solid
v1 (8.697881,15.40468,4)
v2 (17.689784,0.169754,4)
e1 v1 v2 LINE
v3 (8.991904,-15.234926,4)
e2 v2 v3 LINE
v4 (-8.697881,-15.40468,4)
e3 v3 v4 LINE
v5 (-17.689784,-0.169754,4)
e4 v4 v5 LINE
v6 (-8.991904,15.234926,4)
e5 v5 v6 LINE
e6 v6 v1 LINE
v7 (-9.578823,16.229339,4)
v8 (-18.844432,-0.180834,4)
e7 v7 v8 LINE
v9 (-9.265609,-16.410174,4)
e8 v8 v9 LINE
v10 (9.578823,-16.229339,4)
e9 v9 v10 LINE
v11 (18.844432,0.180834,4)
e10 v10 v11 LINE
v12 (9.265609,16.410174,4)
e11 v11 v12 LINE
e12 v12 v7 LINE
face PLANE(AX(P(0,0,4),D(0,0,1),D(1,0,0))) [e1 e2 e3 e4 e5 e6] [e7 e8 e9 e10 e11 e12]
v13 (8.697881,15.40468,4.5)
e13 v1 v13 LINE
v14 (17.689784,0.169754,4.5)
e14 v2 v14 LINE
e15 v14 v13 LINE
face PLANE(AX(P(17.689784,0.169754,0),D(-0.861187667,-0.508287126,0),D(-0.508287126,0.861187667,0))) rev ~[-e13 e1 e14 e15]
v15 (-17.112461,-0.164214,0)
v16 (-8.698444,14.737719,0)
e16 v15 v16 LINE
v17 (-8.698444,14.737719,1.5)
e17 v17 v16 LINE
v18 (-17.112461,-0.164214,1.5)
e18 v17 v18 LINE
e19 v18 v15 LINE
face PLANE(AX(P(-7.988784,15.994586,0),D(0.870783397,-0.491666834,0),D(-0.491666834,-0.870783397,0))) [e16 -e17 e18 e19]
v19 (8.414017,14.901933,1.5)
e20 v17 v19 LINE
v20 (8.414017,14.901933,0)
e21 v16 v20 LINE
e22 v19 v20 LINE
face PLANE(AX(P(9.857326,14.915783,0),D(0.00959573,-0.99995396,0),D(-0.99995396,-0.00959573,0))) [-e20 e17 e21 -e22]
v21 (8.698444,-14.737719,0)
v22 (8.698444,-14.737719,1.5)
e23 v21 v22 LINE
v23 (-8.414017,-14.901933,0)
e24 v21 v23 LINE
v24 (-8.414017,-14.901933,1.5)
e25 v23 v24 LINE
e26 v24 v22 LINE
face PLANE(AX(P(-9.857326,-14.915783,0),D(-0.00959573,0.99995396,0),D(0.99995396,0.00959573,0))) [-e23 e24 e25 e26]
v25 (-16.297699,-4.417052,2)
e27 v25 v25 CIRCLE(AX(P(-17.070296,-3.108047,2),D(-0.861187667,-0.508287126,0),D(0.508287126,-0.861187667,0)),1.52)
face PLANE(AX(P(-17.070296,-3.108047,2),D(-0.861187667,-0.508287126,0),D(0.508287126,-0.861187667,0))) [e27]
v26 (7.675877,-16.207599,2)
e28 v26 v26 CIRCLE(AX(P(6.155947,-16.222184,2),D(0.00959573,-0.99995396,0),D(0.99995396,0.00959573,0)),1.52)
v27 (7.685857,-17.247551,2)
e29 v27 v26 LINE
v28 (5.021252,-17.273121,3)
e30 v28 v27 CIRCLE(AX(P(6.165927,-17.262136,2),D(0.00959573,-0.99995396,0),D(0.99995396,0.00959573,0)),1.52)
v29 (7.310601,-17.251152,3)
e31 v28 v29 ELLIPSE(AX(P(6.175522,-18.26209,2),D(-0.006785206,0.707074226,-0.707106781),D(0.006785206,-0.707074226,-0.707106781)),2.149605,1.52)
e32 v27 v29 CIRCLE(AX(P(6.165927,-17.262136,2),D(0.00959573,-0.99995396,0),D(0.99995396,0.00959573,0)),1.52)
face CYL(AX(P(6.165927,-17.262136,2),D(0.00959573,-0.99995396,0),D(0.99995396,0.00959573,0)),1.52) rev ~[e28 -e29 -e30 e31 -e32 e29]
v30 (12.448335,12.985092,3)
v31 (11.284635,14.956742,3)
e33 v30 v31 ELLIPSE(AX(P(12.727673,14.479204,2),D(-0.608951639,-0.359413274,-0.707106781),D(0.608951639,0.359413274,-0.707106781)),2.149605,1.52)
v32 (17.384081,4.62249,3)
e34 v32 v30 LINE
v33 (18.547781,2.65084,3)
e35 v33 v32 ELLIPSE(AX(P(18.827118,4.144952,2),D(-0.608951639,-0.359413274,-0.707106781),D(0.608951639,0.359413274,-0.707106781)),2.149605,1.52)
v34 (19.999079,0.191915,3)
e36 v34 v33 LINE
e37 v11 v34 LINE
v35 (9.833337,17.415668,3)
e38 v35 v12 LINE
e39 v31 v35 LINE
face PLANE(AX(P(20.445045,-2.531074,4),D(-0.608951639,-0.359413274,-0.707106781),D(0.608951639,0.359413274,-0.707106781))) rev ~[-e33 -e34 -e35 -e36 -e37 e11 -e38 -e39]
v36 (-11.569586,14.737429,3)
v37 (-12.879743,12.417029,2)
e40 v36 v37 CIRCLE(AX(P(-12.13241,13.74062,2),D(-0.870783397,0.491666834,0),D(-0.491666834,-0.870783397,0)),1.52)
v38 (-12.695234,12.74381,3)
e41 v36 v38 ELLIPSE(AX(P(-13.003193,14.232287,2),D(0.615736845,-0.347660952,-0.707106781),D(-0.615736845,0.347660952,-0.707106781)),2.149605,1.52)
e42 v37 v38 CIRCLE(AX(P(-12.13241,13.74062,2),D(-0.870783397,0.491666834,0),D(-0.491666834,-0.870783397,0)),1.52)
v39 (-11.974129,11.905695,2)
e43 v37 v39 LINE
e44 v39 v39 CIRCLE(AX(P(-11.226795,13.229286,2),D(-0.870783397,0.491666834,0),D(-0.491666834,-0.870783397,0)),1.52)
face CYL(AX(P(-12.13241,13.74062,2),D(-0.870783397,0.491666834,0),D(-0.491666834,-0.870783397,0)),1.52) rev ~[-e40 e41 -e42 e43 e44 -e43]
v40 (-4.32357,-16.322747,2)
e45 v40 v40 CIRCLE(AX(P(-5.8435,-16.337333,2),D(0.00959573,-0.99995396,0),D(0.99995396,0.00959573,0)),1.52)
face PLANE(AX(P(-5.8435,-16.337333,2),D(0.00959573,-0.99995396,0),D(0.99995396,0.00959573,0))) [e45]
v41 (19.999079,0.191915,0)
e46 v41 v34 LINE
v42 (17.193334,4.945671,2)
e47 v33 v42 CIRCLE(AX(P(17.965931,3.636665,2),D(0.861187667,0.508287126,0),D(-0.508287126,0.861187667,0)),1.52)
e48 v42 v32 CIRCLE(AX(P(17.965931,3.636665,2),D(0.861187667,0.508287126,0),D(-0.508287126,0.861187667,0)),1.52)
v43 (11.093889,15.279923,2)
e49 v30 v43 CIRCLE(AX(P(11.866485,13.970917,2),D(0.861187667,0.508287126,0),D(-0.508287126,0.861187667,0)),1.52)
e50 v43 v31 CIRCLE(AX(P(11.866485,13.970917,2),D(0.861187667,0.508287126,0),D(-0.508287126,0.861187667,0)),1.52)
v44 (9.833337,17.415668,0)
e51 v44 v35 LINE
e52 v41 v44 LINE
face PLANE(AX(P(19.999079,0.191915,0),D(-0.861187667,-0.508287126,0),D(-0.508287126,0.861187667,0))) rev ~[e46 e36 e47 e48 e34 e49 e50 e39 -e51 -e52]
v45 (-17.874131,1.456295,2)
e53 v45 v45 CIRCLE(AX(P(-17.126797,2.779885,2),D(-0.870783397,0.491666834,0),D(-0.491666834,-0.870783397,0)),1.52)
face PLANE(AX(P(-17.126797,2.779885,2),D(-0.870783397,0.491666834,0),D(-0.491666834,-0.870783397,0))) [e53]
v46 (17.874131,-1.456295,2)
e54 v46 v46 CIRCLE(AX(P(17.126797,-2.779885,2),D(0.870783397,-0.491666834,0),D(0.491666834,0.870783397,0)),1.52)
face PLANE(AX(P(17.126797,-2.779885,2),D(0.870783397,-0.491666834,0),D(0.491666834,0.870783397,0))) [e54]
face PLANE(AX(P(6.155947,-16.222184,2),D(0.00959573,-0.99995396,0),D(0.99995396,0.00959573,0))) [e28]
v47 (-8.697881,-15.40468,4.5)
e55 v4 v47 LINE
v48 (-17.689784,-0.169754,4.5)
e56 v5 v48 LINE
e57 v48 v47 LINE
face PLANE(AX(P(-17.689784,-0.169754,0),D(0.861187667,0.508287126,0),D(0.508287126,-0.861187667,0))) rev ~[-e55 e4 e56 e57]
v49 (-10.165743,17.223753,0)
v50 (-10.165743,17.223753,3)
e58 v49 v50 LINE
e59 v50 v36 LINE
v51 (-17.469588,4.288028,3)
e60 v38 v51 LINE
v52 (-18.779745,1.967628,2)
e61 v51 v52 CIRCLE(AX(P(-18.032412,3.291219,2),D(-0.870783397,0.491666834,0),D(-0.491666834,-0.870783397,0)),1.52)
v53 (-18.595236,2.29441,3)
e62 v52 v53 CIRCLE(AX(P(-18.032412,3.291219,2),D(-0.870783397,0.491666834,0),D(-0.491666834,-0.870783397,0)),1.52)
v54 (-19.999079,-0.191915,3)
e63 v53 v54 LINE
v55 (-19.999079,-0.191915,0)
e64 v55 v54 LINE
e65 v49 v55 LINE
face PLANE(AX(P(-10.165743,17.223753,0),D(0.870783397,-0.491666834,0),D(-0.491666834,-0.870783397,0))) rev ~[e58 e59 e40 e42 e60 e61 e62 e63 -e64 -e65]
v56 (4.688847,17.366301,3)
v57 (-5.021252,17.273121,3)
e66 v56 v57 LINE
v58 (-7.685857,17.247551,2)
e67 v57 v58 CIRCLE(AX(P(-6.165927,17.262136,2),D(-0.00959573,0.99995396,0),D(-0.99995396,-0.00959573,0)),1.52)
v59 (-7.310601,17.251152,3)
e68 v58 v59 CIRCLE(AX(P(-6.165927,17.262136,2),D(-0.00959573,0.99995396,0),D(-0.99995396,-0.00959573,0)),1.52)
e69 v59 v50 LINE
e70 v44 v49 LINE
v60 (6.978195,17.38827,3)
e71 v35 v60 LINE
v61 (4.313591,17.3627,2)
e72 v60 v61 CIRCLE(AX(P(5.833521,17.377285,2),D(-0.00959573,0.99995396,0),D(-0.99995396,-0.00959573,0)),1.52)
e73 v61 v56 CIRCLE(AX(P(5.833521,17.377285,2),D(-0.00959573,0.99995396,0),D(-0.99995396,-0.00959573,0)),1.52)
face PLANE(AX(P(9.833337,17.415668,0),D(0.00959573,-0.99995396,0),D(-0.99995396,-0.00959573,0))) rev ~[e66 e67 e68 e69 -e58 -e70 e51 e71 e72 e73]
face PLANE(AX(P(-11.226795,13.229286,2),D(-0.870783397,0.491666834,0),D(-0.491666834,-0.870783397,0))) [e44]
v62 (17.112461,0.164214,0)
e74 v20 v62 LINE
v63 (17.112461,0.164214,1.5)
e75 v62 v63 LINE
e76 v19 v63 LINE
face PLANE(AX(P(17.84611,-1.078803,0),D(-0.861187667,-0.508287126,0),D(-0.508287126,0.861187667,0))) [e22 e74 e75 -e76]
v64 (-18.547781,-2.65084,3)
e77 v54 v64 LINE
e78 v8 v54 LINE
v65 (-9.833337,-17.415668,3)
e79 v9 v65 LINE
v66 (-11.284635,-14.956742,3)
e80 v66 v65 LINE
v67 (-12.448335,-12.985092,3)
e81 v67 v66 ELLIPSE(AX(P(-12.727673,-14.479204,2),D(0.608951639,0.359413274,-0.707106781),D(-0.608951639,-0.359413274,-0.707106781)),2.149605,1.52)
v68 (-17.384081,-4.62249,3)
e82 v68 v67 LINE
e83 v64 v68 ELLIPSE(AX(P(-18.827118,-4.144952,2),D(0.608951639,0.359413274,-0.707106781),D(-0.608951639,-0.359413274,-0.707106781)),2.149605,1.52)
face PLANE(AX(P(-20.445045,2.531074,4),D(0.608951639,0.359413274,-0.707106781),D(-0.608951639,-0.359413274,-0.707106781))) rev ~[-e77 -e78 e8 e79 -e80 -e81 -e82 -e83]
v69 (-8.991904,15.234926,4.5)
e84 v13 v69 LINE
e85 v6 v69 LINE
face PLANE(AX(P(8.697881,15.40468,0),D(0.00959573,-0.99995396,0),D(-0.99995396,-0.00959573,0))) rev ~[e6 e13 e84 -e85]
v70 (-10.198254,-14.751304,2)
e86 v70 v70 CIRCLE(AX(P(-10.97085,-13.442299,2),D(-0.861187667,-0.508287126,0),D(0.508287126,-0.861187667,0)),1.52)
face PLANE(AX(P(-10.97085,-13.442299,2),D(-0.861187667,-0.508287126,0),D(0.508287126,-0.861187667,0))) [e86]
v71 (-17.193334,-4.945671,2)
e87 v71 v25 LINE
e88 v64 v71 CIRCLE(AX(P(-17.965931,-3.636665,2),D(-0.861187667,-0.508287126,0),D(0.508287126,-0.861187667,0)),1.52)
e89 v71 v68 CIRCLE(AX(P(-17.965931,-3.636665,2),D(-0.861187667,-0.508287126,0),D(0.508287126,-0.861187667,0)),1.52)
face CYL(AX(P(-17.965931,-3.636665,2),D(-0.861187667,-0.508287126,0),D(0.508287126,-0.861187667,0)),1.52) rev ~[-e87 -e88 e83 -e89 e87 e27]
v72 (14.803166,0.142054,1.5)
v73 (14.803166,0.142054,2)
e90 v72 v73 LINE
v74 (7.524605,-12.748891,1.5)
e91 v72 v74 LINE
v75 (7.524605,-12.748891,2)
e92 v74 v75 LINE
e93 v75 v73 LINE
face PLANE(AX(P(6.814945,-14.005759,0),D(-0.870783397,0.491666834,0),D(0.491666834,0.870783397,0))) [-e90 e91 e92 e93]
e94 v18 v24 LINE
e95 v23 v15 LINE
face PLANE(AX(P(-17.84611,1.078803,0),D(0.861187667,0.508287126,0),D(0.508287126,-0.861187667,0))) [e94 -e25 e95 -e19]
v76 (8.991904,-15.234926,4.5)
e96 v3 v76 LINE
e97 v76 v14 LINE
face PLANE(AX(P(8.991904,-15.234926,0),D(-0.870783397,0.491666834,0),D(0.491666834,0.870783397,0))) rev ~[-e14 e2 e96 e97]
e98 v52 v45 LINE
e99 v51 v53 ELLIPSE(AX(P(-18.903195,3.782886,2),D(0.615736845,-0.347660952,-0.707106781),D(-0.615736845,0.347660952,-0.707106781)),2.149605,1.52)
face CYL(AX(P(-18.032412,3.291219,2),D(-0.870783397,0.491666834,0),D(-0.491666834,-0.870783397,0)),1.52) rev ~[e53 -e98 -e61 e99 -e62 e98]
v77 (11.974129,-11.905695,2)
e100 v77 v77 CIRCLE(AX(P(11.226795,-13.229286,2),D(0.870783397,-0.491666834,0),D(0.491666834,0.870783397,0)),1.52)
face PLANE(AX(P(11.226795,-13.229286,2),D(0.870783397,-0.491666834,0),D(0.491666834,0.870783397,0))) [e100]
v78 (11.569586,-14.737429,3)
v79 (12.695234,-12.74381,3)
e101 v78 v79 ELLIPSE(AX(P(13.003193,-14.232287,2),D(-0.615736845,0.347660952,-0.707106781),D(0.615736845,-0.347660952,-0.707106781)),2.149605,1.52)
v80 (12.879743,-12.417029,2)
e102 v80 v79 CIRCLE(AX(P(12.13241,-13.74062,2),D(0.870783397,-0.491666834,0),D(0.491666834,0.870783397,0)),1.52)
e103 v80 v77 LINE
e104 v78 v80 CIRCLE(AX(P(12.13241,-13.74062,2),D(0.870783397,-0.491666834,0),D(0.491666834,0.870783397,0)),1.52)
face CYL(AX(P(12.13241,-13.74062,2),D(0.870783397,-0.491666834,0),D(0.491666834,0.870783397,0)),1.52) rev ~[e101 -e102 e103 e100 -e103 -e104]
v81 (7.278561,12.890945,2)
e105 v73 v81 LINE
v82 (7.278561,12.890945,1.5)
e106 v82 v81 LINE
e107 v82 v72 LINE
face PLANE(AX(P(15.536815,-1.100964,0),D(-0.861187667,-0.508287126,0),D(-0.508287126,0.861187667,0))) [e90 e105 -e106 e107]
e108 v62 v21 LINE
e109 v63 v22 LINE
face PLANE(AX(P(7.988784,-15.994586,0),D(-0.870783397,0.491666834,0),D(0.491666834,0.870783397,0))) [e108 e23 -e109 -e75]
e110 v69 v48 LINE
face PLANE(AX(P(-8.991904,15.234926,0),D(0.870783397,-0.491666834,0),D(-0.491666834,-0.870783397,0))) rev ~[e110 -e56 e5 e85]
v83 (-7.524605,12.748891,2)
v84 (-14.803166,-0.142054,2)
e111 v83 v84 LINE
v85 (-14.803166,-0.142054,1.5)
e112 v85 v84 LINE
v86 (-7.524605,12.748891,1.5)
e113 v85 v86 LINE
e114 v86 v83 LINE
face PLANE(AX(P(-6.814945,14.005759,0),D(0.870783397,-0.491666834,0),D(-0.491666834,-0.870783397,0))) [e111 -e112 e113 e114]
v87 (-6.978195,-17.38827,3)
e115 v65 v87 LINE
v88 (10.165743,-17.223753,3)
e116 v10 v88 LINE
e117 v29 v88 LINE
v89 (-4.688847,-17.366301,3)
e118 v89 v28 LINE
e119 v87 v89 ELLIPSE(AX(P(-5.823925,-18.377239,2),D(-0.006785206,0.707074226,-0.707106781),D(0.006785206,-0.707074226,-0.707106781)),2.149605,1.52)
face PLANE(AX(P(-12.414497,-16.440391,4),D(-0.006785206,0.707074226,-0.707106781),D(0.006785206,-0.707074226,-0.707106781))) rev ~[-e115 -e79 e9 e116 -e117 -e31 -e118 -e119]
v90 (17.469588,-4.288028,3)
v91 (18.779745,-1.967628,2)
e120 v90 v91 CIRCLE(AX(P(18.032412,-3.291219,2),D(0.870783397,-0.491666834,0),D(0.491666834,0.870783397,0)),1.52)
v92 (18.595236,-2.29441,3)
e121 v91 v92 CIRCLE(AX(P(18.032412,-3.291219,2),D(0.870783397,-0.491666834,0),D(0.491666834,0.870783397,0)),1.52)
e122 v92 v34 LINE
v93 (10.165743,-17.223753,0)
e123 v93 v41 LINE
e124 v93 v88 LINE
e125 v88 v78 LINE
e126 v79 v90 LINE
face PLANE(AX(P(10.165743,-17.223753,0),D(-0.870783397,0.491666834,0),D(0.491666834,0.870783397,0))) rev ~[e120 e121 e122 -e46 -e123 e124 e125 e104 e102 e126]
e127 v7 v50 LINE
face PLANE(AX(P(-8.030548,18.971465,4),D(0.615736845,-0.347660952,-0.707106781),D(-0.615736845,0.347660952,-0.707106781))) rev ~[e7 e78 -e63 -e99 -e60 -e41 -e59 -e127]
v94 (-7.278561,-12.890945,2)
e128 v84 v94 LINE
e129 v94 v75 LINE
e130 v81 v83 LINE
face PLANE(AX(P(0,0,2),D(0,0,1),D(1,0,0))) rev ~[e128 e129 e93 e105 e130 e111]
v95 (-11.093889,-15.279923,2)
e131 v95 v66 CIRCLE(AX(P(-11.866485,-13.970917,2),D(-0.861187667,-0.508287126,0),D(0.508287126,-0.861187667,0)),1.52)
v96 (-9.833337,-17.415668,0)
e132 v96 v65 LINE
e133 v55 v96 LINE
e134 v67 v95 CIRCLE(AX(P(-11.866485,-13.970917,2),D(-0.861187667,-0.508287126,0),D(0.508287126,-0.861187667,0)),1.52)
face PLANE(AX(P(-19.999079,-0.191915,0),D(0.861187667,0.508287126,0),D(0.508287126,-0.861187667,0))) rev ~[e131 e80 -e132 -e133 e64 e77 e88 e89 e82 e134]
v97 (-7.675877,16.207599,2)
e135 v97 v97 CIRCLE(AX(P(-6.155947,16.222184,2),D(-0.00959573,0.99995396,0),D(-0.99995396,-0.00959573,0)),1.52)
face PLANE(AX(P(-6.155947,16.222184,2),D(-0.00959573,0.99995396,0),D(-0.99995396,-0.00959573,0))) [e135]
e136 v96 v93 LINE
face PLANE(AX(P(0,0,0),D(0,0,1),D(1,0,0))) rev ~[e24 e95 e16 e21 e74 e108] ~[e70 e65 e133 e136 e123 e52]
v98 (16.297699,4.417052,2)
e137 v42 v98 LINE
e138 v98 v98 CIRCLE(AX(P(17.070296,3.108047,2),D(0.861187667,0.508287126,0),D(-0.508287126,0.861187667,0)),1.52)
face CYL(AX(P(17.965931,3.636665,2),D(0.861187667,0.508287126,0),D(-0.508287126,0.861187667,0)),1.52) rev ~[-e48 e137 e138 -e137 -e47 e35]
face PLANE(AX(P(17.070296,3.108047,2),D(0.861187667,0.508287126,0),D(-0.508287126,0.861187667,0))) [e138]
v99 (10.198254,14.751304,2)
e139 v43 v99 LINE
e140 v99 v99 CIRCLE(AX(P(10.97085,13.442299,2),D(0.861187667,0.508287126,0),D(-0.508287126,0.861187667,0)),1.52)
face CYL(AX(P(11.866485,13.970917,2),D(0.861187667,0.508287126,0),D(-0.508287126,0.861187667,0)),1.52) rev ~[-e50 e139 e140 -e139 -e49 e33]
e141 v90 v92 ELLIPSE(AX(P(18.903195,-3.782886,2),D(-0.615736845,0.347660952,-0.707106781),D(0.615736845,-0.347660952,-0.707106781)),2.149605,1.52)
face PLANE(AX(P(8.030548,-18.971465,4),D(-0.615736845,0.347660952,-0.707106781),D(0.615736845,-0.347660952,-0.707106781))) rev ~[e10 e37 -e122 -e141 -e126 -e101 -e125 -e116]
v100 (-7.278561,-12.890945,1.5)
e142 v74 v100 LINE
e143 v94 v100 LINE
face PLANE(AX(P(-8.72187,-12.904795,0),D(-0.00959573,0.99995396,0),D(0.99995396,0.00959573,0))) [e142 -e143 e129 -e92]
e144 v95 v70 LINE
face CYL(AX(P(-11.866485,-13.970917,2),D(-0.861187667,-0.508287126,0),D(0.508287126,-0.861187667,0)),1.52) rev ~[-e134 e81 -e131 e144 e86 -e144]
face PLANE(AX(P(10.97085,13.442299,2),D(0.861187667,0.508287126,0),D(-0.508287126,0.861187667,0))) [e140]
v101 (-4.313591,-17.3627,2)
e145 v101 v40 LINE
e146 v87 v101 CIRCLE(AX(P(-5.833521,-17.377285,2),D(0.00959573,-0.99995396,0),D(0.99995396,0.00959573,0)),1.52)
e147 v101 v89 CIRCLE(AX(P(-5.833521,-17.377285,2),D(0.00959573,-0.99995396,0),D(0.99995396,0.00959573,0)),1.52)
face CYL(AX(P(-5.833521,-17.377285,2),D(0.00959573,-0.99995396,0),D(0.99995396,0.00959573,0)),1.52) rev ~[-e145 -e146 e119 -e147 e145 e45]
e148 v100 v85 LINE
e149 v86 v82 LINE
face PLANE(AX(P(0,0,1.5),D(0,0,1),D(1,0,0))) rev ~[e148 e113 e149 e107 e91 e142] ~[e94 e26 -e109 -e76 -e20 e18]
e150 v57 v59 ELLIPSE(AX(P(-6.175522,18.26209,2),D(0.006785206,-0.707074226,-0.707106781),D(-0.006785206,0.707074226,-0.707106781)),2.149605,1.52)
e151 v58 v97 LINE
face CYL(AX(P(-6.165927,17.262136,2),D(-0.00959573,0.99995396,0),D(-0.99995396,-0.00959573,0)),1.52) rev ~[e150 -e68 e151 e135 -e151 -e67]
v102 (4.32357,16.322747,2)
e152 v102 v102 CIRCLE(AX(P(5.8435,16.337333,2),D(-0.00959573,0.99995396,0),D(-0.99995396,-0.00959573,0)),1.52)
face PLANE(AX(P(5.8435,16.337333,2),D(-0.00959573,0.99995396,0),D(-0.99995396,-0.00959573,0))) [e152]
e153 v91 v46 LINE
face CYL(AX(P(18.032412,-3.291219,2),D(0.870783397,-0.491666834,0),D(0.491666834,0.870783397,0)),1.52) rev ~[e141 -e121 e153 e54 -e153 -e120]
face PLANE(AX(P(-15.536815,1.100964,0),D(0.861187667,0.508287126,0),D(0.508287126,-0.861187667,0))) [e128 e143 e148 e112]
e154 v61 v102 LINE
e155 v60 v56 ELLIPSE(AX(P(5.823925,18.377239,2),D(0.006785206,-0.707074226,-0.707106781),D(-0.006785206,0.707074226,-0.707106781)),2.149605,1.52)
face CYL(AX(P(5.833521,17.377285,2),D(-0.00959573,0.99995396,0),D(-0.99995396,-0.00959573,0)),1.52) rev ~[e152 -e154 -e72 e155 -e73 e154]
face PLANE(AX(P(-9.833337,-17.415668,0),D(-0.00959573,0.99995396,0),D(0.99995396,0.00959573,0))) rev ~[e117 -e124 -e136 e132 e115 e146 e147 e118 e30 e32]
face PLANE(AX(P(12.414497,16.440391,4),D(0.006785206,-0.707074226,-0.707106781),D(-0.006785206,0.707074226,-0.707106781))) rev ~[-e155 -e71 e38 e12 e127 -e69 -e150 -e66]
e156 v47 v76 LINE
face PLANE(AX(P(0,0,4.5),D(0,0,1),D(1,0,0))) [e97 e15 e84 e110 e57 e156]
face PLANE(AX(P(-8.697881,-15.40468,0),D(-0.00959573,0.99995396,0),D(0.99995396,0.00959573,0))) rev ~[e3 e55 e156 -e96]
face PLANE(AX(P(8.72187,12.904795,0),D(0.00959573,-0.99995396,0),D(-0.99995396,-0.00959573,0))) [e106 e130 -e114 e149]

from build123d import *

# Parameters (mm, degrees)
F1_DEPTH      = 4.5
F2_DEPTH      = 4
F3_T          = -2.5
F4_R          = 1.52
F5_DEPTH      = 1.04
F6_R          = 1.52
F7_DEPTH      = 1.04
F8_R          = 1.52
F9_DEPTH      = 1.04
F10_R         = 1.52
F11_DEPTH     = 1.04
F12_R         = 1.52
F13_DEPTH     = 1.04
F14_R         = 1.52
F15_DEPTH     = 1.04
F16_T1_DEPTH  = 25.1433659759
F16_T3_DEPTH  = 25.1433659759
F16_T5_DEPTH  = 25.1433659759
F16_T7_DEPTH  = 25.1433659759
F16_T9_DEPTH  = 25.1433659759
F16_T11_DEPTH = 25.1433659759


# Not quite as in the source:
# - a fillet or chamfer that OpenCascade refuses, or shapes differently, is made with other operations: its cross-section is extruded or revolved along the edge and cut away or added


with BuildPart() as f1:
    # F0 (on Top) → F1 (new body)
    with BuildSketch(Plane.XY):
        Polygon((-8.9919036831, 15.2349256124), (-17.6897844467, -0.1697542118), (-8.6978807636, -15.4046798242), (8.9919036831, -15.2349256124), (17.6897844467, 0.1697542118), (8.6978807636, 15.4046798242), align=None)
    extrude(amount=F1_DEPTH)

    # F0 (on Top) → F2 (join)
    with BuildSketch(Plane.XY):
        Polygon((-19.9990791985, -0.1919146011), (-9.8333366793, -17.4156679387), (10.1657425191, -17.2237533376), (19.9990791985, 0.1919146011), (9.8333366793, 17.4156679387), (-10.1657425191, 17.2237533376), align=None)
        Polygon((-8.6978807636, -15.4046798242), (-17.6897844467, -0.1697542118), (-8.9919036831, 15.2349256124), (8.6978807636, 15.4046798242), (17.6897844467, 0.1697542118), (8.9919036831, -15.2349256124), align=None, mode=Mode.SUBTRACT)
    extrude(amount=F2_DEPTH)

    # F3
    f3_openings = [f1.faces().sort_by_distance(p)[0] for p in [
        (0, 0, 0),
    ]]
    offset(amount=F3_T, openings=f3_openings, kind=Kind.INTERSECTION)

    # F4 (on face) → F5 (cut)
    with BuildSketch(Plane(origin=(15.0824108588, -8.5159193683, 0), x_dir=(0.491666834, 0.8707833969, 0), z_dir=(0.8707833969, -0.491666834, 0))):
        with Locations((-6, 2)):
            Circle(F4_R)
        with Locations((6, 2)):
            Circle(F4_R)
    extrude(amount=-F5_DEPTH, mode=Mode.SUBTRACT)

    # F6 (on face) → F7 (cut)
    with BuildSketch(Plane(origin=(0.1662029199, -17.3197106382, 0), x_dir=(0.9999539599, 0.0095957301, 0), z_dir=(0.0095957301, -0.9999539599, 0))):
        with Locations((-6, 2)):
            Circle(F6_R)
        with Locations((6, 2)):
            Circle(F6_R)
    extrude(amount=-F7_DEPTH, mode=Mode.SUBTRACT)

    # F8 (on face) → F9 (cut)
    with BuildSketch(Plane(origin=(-14.9162079389, -8.8037912699, 0), x_dir=(0.508287126, -0.8611876669, 0), z_dir=(-0.8611876669, -0.508287126, 0))):
        with Locations((-6, 2)):
            Circle(F8_R)
        with Locations((6, 2)):
            Circle(F8_R)
    extrude(amount=-F9_DEPTH, mode=Mode.SUBTRACT)

    # F10 (on face) → F11 (cut)
    with BuildSketch(Plane(origin=(-15.0824108588, 8.5159193683, 0), x_dir=(-0.491666834, -0.8707833969, 0), z_dir=(-0.8707833969, 0.491666834, 0))):
        with Locations((-6, 2)):
            Circle(F10_R)
        with Locations((6, 2)):
            Circle(F10_R)
    extrude(amount=-F11_DEPTH, mode=Mode.SUBTRACT)

    # F12 (on face) → F13 (cut)
    with BuildSketch(Plane(origin=(-0.1662029199, 17.3197106382, 0), x_dir=(-0.9999539599, -0.0095957301, 0), z_dir=(-0.0095957301, 0.9999539599, 0))):
        with Locations((-6, 2)):
            Circle(F12_R)
        with Locations((6, 2)):
            Circle(F12_R)
    extrude(amount=-F13_DEPTH, mode=Mode.SUBTRACT)

    # F14 (on face) → F15 (cut)
    with BuildSketch(Plane(origin=(14.9162079389, 8.8037912699, 0), x_dir=(-0.508287126, 0.8611876669, 0), z_dir=(0.8611876669, 0.508287126, 0))):
        with Locations((-6, 2)):
            Circle(F14_R)
        with Locations((6, 2)):
            Circle(F14_R)
    extrude(amount=-F15_DEPTH, mode=Mode.SUBTRACT)

    # F16: chamfer of 1 on 6 edges, made by hand

    # F16_s2 → F16_t1 (cut)
    with BuildSketch(Plane(origin=(6.3900246144, -10.8265783412, 0), x_dir=(0, 0, 1), z_dir=(-0.508287126, 0.8611876669, 0))):
        Polygon((4, 16.3205080757), (3, 17.3205080757), (4, 17.3205080757), align=None)
    extrude(amount=F16_T1_DEPTH, mode=Mode.SUBTRACT)

    # F16_s4 → F16_t3 (cut)
    with BuildSketch(Plane(origin=(-6.1810795723, -10.9472128174, 0), x_dir=(0, 0, 1), z_dir=(0.491666834, 0.8707833969, 0))):
        Polygon((4, 16.3205080757), (3, 17.3205080757), (4, 17.3205080757), align=None)
    extrude(amount=F16_T3_DEPTH, mode=Mode.SUBTRACT)

    # F16_s6 → F16_t5 (cut)
    with BuildSketch(Plane(origin=(-12.5711041867, -0.1206344763, 0), x_dir=(0, 0, 1), z_dir=(0.9999539599, 0.0095957301, 0))):
        Polygon((4, 16.3205080757), (3, 17.3205080757), (4, 17.3205080757), align=None)
    extrude(amount=F16_T5_DEPTH, mode=Mode.SUBTRACT)

    # F16_s8 → F16_t7 (cut)
    with BuildSketch(Plane(origin=(-6.3900246144, 10.8265783412, 0), x_dir=(0, 0, 1), z_dir=(0.508287126, -0.8611876669, 0))):
        Polygon((4, 16.3205080757), (3, 17.3205080757), (4, 17.3205080757), align=None)
    extrude(amount=F16_T7_DEPTH, mode=Mode.SUBTRACT)

    # F16_s10 → F16_t9 (cut)
    with BuildSketch(Plane(origin=(6.1810795723, 10.9472128174, 0), x_dir=(0, 0, 1), z_dir=(-0.491666834, -0.8707833969, 0))):
        Polygon((4, 16.3205080757), (3, 17.3205080757), (4, 17.3205080757), align=None)
    extrude(amount=F16_T9_DEPTH, mode=Mode.SUBTRACT)

    # F16_s12 → F16_t11 (cut)
    with BuildSketch(Plane(origin=(12.5711041867, 0.1206344763, 0), x_dir=(0, 0, 1), z_dir=(-0.9999539599, -0.0095957301, 0))):
        Polygon((4, 16.3205080757), (3, 17.3205080757), (4, 17.3205080757), align=None)
    extrude(amount=F16_T11_DEPTH, mode=Mode.SUBTRACT)


solid = f1.part
